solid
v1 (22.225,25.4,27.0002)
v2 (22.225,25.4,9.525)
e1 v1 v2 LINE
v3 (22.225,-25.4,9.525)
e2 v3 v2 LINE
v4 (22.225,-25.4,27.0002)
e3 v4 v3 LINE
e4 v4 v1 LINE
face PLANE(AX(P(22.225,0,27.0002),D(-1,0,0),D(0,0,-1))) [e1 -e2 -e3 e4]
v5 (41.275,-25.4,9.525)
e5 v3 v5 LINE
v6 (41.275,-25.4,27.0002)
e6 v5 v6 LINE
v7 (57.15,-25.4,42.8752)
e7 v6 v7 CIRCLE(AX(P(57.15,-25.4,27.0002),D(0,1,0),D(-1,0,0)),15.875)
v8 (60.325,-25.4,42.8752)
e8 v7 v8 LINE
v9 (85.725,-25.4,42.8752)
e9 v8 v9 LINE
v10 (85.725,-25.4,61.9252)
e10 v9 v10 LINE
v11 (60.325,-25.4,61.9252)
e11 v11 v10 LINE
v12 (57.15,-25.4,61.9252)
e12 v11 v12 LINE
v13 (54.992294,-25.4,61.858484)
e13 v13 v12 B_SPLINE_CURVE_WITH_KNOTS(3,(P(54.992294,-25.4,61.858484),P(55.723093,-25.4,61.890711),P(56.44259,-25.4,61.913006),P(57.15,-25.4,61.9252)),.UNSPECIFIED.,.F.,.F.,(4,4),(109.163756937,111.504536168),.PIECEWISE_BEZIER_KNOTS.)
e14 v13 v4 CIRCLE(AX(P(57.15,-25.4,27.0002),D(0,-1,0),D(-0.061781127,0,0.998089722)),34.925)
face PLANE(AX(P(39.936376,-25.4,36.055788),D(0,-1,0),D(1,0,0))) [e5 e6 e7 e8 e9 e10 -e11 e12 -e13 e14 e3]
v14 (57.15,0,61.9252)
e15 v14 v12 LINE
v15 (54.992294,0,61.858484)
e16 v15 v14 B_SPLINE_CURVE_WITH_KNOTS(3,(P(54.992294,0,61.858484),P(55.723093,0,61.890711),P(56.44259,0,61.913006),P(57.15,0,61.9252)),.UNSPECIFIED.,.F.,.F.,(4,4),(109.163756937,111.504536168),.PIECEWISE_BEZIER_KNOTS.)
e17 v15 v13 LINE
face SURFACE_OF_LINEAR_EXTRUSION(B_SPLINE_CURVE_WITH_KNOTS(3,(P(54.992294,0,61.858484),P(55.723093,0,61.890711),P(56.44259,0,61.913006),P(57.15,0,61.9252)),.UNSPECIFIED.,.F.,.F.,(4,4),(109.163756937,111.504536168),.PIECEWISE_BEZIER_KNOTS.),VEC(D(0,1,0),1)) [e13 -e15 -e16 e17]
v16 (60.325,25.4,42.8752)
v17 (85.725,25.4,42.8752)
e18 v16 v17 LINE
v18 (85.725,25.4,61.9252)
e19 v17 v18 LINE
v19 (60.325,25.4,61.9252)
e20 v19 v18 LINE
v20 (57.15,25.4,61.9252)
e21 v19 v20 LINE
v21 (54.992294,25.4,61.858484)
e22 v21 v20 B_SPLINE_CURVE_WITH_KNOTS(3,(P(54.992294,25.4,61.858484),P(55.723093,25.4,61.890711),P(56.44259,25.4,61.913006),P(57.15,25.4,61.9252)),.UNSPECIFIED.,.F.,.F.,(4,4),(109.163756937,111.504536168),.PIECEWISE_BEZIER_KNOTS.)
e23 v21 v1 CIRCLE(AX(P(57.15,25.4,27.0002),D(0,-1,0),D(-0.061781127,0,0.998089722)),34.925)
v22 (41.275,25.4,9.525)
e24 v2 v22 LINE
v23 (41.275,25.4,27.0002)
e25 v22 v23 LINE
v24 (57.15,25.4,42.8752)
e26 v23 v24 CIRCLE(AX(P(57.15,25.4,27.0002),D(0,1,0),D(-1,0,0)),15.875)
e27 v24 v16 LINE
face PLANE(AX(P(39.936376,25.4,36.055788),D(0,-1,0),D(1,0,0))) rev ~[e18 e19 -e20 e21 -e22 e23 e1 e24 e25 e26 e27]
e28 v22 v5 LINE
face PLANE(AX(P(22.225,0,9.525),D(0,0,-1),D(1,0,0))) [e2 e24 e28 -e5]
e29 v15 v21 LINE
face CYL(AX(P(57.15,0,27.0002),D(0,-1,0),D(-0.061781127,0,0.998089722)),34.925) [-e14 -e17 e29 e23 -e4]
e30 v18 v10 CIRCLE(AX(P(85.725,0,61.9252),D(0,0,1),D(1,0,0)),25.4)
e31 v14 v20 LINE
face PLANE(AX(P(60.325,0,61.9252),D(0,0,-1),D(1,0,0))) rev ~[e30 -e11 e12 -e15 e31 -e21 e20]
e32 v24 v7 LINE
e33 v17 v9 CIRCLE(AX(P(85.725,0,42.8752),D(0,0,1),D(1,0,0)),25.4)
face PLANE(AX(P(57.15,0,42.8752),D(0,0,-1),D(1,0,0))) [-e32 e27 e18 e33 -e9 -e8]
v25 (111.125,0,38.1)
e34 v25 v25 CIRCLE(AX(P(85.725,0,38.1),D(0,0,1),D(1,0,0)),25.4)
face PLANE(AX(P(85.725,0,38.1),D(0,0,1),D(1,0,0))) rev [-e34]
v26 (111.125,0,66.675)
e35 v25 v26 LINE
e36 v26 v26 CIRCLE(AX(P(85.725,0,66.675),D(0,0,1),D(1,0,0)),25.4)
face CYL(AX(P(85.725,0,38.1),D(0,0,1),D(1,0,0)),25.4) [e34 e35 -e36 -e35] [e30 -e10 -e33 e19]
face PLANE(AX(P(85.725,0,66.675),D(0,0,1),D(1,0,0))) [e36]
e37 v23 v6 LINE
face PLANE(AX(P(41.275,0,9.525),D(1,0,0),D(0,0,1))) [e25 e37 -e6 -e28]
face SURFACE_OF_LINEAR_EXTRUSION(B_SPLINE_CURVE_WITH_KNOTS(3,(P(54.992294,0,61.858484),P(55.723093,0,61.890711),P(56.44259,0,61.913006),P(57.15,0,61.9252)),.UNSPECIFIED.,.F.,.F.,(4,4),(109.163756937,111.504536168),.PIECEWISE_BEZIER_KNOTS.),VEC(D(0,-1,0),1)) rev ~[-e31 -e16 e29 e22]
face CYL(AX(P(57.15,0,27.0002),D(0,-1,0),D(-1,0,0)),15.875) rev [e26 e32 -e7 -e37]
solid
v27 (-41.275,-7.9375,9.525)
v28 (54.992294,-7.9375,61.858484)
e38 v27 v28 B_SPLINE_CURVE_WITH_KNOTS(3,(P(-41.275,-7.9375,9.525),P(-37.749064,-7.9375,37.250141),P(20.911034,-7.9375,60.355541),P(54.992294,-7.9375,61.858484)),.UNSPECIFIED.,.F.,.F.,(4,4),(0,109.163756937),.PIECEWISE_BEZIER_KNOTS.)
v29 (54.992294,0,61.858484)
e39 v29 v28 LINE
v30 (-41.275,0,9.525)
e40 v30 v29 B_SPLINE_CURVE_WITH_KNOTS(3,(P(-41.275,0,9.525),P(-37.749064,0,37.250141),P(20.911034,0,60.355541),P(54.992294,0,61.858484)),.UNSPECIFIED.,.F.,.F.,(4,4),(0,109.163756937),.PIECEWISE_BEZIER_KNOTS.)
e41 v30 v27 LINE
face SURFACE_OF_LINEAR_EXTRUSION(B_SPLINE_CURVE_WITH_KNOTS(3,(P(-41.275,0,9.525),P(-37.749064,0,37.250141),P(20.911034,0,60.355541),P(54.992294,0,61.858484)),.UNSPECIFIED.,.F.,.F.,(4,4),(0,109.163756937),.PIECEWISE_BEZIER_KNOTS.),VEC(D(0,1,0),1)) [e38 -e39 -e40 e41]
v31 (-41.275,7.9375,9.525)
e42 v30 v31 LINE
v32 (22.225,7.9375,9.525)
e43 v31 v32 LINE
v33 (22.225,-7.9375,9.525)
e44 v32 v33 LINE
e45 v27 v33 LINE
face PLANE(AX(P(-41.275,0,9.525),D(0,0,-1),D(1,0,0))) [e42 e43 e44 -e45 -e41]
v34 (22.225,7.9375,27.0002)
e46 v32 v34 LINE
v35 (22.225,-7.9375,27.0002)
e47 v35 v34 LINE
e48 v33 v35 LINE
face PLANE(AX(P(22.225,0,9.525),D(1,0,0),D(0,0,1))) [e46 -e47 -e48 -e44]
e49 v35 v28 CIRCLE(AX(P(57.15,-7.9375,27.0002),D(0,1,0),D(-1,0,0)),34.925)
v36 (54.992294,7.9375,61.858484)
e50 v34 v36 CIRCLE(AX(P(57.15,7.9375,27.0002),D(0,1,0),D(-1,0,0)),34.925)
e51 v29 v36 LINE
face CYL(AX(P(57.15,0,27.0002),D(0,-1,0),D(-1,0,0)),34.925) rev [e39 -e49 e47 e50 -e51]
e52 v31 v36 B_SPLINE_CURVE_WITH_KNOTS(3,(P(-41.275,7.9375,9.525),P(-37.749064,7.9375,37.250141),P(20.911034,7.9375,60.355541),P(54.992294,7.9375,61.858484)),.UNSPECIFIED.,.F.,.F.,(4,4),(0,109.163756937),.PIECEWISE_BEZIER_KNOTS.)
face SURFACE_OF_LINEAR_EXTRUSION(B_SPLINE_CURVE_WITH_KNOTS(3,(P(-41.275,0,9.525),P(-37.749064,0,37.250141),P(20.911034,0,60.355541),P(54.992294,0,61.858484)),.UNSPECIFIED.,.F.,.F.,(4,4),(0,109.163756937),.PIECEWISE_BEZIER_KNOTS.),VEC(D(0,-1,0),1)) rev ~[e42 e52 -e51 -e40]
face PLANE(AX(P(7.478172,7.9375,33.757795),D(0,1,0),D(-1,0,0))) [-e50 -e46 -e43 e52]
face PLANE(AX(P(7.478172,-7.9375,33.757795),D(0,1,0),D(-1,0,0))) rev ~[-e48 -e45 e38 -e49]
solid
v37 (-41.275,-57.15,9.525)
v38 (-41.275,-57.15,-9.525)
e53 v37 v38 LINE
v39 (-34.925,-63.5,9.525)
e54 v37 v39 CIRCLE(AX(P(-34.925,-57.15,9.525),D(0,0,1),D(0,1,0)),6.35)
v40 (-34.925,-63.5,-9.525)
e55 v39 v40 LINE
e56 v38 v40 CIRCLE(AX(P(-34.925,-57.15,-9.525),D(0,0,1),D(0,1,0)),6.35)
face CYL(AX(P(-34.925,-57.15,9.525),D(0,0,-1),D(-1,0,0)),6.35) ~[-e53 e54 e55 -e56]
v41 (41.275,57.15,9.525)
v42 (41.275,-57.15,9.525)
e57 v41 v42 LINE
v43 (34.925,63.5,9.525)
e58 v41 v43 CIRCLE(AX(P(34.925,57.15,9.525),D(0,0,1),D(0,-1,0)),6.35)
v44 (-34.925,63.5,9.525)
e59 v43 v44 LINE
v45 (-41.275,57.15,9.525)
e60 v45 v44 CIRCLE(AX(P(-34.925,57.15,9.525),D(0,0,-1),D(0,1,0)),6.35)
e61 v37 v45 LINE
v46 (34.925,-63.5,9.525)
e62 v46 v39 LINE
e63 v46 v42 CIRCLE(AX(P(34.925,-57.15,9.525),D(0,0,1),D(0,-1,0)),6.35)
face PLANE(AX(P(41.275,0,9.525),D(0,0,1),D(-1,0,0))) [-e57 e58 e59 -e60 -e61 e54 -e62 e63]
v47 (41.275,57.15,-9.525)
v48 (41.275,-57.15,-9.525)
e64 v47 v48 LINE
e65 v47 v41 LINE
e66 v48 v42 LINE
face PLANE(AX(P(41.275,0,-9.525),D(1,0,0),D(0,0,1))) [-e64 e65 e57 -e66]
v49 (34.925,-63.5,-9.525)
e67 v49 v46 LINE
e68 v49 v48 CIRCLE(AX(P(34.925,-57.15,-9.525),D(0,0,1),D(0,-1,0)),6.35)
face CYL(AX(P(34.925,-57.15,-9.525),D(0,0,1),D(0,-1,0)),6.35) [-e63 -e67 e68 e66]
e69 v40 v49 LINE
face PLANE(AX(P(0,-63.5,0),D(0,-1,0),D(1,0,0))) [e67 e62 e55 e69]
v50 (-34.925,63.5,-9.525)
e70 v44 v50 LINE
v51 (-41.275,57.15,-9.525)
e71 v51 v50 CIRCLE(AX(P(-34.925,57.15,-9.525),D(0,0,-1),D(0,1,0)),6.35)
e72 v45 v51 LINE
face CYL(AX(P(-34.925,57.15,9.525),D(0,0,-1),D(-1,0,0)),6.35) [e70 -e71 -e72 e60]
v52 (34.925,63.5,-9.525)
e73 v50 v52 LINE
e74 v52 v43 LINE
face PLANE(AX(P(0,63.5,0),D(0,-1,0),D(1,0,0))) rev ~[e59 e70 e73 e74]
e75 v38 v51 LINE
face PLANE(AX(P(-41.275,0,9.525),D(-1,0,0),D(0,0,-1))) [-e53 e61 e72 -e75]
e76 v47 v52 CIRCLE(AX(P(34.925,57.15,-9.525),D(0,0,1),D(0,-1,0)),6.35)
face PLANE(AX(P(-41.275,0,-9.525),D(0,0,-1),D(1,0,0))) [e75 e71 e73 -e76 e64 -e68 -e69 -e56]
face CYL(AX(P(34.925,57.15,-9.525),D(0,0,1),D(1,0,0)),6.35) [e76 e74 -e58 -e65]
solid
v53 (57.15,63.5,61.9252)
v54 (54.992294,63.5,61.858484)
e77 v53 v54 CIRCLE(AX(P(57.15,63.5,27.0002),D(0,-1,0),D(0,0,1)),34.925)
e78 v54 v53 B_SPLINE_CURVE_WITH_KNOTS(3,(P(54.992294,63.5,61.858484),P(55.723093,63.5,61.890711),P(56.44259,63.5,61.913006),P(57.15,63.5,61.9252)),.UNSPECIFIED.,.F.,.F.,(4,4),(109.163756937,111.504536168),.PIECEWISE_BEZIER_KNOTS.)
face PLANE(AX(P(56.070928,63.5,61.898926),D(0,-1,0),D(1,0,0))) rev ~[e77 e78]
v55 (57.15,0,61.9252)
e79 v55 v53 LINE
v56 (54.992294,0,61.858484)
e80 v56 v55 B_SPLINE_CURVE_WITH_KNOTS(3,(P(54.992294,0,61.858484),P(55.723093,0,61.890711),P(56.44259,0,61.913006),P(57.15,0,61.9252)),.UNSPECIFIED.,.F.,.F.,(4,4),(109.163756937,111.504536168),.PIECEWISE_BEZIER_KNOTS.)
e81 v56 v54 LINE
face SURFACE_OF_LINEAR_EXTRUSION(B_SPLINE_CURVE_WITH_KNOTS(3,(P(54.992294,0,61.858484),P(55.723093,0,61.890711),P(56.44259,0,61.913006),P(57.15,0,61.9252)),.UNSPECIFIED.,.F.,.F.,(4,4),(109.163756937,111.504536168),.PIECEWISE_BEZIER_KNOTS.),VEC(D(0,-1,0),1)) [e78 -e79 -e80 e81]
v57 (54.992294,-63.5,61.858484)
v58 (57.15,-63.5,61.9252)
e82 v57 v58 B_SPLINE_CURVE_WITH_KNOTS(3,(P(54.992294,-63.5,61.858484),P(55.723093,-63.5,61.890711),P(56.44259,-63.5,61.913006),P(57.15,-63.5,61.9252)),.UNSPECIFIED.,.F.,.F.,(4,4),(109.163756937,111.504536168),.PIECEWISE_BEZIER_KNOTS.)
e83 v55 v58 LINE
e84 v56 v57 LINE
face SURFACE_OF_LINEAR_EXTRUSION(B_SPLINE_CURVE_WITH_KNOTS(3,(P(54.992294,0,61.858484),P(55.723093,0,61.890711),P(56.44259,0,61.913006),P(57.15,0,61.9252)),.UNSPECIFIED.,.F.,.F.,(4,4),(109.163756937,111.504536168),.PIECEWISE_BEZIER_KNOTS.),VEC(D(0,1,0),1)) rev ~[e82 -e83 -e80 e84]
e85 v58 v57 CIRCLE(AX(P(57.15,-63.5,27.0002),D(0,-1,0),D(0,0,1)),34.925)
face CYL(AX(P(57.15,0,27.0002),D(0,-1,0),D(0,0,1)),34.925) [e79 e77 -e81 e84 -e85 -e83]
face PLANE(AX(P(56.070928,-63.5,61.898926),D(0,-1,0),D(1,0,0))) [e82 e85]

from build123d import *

# Parameters (mm, degrees)
F1_DEPTH = 63.5
F0_W     = 25.4
F0_H     = 19.0500000095
F2_DEPTH = 25.4
F3_DEPTH = 7.9375
F5_R     = 6.35


with BuildPart() as f1:
    # F0 (on Front) → F1 (new body, symmetric)
    with BuildSketch(Plane.XZ):
        with BuildLine():
            ThreePointArc((57.15, 61.9252000095), (56.0706314791, 61.9085169067), (54.9922941517, 61.8584835368))
            add(Edge.make_bspline(
                [(54.9922941517, 61.8584835368), (55.7230926251, 61.8907108689), (56.4425898793, 61.9130055057), (57.15, 61.9252000095)],
                knots=[109.1637569367, 109.1637569367, 109.1637569367, 109.1637569367, 111.504536168, 111.504536168, 111.504536168, 111.504536168], degree=3))
        make_face()
    extrude(amount=F1_DEPTH, both=True)


with BuildPart() as f1b:
    # F0 (on Front) → F1, piece 2 (new body, symmetric)
    with BuildSketch(Plane.XZ):
        Polygon((-41.275, -9.525), (41.275, -9.525), (41.275, 9.525), (22.2249999905, 9.525), (-41.275, 9.525), align=None)
    extrude(amount=F1_DEPTH, both=True)

    # F5
    f5_edges = [f1b.edges().sort_by_distance(p)[0] for p in [
        (41.275, -63.5, 0),
        (41.275, 63.5, 0),
        (-41.275, 63.5, 0),
        (-41.275, -63.5, 0),
    ]]
    fillet(f5_edges, radius=F5_R)


with BuildPart() as f2:
    # F0 (on Front) → F2 (new body, symmetric)
    with BuildSketch(Plane.XZ):
        with BuildLine():
            Line((22.2249999905, 9.525), (41.275, 9.525))
            Line((41.275, 9.525), (41.275, 27.0002))
            ThreePointArc((41.275, 27.0002), (45.9246798487, 38.2255201513), (57.15, 42.8752))
            Line((57.15, 42.8752), (60.325, 42.8752))
            Line((60.325, 42.8752), (60.325, 61.9252000095))
            Line((60.325, 61.9252000095), (57.15, 61.9252000095))
            add(Edge.make_bspline(
                [(54.9922941517, 61.8584835368), (55.7230926251, 61.8907108689), (56.4425898793, 61.9130055057), (57.15, 61.9252000095)],
                knots=[109.1637569367, 109.1637569367, 109.1637569367, 109.1637569367, 111.504536168, 111.504536168, 111.504536168, 111.504536168], degree=3))
            ThreePointArc((54.9922941517, 61.8584835368), (31.702863595, 50.920878804), (22.2249999905, 27.0002))
            Line((22.2249999905, 27.0002), (22.2249999905, 9.525))
        make_face()
        with Locations((73.025, 52.4002000047)):
            Rectangle(F0_W, F0_H)
    extrude(amount=F2_DEPTH, both=True)

    # F0 (on Front) → F4 (revolve)
    with BuildSketch(Plane.XZ):
        Polygon((85.725, 61.9252000095), (85.725, 42.8752), (85.725, 38.1), (111.125, 38.1), (111.125, 66.675), (85.725, 66.675), align=None)
    revolve(axis=Axis((85.725, 0, 52.3875), (0, 0, 1)))


with BuildPart() as f3:
    # F0 (on Front) → F3 (new body, symmetric)
    with BuildSketch(Plane.XZ):
        with BuildLine():
            add(Edge.make_bspline(
                [(-41.275, 9.525), (-37.7490644721, 37.2501413938), (20.9110335802, 60.3555410121), (54.9922941517, 61.8584835368)],
                knots=[0, 0, 0, 0, 109.1637569367, 109.1637569367, 109.1637569367, 109.1637569367], degree=3))
            Line((-41.275, 9.525), (22.2249999905, 9.525))
            Line((22.2249999905, 9.525), (22.2249999905, 27.0002))
            ThreePointArc((22.2249999905, 27.0002), (31.702863595, 50.920878804), (54.9922941517, 61.8584835368))
        make_face()
    extrude(amount=F3_DEPTH, both=True)


solid = Compound([f1.part, f1b.part, f2.part, f3.part])
